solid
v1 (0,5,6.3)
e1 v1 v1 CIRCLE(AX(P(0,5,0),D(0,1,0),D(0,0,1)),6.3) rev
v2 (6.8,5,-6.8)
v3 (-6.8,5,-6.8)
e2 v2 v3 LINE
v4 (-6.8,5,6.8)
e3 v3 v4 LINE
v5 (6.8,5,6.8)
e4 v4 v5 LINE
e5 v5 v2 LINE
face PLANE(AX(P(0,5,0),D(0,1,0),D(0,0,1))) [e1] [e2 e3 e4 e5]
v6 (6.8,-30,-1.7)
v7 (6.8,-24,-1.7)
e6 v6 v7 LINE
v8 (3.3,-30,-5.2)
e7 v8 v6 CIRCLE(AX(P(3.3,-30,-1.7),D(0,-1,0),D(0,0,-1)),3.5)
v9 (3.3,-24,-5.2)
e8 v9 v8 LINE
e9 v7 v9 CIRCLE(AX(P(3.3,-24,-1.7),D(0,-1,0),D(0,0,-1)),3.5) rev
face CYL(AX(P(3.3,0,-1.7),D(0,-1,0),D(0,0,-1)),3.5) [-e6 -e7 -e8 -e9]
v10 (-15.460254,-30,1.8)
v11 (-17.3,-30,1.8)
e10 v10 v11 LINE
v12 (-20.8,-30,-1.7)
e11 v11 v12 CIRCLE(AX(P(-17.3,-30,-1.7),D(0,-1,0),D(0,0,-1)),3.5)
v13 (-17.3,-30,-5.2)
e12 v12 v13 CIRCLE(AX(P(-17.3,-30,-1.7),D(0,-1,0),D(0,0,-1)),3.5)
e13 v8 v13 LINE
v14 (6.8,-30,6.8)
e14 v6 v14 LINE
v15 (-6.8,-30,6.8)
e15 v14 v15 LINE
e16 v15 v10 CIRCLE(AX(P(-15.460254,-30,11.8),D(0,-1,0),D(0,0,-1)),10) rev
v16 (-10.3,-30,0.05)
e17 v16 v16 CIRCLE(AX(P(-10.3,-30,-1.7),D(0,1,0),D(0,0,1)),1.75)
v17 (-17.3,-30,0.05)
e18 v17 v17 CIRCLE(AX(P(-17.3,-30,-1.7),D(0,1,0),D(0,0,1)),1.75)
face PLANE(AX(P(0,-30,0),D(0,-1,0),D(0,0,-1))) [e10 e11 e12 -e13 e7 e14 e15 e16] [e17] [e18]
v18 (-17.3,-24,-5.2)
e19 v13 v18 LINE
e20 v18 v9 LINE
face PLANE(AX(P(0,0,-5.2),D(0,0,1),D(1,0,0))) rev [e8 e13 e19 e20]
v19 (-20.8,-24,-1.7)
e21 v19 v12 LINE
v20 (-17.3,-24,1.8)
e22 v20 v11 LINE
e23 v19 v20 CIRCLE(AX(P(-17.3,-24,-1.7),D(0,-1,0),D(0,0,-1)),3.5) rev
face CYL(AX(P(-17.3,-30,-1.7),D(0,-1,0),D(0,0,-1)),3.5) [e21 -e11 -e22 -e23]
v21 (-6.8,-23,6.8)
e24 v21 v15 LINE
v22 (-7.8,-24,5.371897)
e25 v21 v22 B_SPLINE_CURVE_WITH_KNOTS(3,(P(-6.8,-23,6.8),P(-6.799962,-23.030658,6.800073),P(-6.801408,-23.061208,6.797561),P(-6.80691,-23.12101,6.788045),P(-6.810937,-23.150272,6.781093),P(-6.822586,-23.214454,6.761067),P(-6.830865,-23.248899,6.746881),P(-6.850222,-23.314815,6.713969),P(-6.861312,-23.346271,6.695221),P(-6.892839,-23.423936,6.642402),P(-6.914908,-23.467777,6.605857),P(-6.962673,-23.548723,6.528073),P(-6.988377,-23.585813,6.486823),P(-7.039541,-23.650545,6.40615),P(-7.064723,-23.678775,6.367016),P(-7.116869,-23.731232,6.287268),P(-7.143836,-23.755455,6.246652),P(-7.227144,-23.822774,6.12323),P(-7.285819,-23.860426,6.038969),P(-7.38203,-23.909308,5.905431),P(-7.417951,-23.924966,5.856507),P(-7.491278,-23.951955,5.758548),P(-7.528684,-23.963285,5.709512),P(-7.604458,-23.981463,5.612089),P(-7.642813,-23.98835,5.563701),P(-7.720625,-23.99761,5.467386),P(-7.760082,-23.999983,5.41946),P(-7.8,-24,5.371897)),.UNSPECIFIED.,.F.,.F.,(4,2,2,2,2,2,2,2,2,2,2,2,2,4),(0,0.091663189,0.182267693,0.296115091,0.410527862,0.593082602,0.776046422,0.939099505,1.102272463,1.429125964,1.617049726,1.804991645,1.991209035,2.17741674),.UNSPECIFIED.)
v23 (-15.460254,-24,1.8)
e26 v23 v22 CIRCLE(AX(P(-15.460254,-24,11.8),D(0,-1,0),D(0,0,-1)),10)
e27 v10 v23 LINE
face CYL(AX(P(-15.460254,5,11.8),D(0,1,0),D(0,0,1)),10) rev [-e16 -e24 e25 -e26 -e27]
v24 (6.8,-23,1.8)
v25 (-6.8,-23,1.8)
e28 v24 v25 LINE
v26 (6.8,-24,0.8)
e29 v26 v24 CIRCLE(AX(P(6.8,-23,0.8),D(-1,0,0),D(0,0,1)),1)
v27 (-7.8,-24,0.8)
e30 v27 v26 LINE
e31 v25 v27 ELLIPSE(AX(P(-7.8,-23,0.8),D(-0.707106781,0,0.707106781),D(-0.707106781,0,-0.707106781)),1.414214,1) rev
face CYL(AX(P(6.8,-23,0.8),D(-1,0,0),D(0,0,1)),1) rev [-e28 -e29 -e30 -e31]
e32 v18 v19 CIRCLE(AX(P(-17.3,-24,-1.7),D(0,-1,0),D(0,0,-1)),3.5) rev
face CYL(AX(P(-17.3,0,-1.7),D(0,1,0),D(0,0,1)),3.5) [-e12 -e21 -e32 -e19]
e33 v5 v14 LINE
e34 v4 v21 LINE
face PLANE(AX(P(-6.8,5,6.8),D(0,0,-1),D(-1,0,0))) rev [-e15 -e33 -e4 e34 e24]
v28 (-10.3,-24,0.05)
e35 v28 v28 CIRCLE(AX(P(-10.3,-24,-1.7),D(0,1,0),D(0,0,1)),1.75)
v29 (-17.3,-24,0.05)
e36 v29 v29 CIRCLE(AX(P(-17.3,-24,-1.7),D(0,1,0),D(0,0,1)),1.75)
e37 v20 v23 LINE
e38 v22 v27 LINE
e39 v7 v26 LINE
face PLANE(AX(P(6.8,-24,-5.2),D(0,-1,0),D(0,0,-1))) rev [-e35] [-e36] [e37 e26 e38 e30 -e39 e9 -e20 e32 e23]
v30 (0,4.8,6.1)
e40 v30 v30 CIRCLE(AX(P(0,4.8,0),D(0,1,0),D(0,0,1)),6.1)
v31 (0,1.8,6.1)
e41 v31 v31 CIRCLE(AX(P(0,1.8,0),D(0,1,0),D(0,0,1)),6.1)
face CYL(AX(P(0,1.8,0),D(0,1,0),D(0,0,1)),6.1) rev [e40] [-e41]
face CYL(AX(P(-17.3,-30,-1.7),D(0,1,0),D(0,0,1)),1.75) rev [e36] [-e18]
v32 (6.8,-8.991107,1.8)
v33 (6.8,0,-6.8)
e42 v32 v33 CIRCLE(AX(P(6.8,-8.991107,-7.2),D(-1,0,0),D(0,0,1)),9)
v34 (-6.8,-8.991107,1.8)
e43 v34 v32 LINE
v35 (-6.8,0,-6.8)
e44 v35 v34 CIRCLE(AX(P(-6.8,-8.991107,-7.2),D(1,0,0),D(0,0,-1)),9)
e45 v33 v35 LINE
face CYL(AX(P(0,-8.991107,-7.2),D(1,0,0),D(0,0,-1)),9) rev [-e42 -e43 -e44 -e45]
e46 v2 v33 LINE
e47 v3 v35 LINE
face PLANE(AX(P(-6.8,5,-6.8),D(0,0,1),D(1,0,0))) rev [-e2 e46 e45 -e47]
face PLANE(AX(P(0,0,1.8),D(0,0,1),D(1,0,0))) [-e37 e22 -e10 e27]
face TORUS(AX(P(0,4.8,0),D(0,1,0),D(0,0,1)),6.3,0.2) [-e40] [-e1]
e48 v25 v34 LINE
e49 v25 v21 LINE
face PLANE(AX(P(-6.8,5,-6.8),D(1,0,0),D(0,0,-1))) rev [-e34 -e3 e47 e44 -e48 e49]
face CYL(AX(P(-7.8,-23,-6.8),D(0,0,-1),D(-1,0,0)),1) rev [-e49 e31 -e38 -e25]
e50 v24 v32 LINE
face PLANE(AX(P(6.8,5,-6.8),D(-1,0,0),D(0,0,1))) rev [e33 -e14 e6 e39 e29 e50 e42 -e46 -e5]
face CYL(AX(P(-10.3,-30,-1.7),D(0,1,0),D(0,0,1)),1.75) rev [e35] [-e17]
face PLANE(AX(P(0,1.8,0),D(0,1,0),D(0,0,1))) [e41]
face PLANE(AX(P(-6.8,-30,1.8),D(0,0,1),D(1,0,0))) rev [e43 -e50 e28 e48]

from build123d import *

# Parameters (mm, degrees)
SKETCH1_W           = 13.6
SKETCH1_H           = 13.6
BOSS_EXTRUDE1_DEPTH = 5
SKETCH2_R           = 6.1
CUT_EXTRUDE1_DEPTH  = 3.2
SKETCH3_W           = 13.6
SKETCH3_H           = 5
BOSS_EXTRUDE2_DEPTH = 30
FILLET1_R           = 0.2
FILLET2_R           = 9
SKETCH10_W          = 27.6
SKETCH10_H          = 6
BOSS_EXTRUDE5_DEPTH = 7
SKETCH11_R          = 1.75
CUT_EXTRUDE4_DEPTH  = 37.330152766
FILLET3_R           = 10
FILLET4_R           = 3.5
FILLET5_R           = 1


# Some blends are built 0.0001 mm under size
with BuildPart() as part:
    # Sketch1 → Boss-Extrude1 (new body)
    with BuildSketch(Plane(origin=(0, 0, 0), x_dir=(1, 0, 0), z_dir=(0, 1, 0))):
        Rectangle(SKETCH1_W, SKETCH1_H)
    extrude(amount=BOSS_EXTRUDE1_DEPTH)

    # Sketch2 → Cut-Extrude1 (cut)
    with BuildSketch(Plane(origin=(0, 5, 0), x_dir=(1, 0, 0), z_dir=(0, 1, 0))):
        with Locations(Location((0, 0, 0), (0, 0, 270))):
            Circle(SKETCH2_R)
    extrude(amount=-CUT_EXTRUDE1_DEPTH, mode=Mode.SUBTRACT)

    # Sketch3 → Boss-Extrude2 (add)
    with BuildSketch(Plane.XZ):
        with Locations((0, 4.3)):
            Rectangle(SKETCH3_W, SKETCH3_H)
    extrude(amount=BOSS_EXTRUDE2_DEPTH)

    # Fillet1
    fillet1_edges = [part.edges().sort_by_distance(p)[0] for p in [
        (0, 5, -6.1),
    ]]
    fillet(fillet1_edges, radius=FILLET1_R)

    # Fillet2
    # the kernel refuses this fillet: 9 mm, written as the material it adds along each edge
    with BuildSketch(Plane(origin=(6.8, 0, 1.8), x_dir=(0, 0, -1), z_dir=(-1, 0, 0))) as fillet2_piece_1:
        with BuildLine():
            CenterArc((9, 8.991106717), FILLET2_R, 180, 87.452681817)
            Line((0, 8.991106717), (-0.18, 8.991106717))
            Line((-0.18, 8.991106717), (-0.18, 0))
            Line((-0.18, 0), (0, -0.18))
            ThreePointArc((0, -0.18), (4.3, -0.18), (8.592, -0.179822134))
            Line((8.592, -0.179822134), (8.6, 0))
        make_face()
    extrude(amount=13.6)

    # Sketch10 → Boss-Extrude5 (add)
    with BuildSketch(Plane(origin=(0, 0, 1.8), x_dir=(-1, 0, 0), z_dir=(0, 0, -1))):
        with Locations((7, -27)):
            Rectangle(SKETCH10_W, SKETCH10_H)
    extrude(amount=BOSS_EXTRUDE5_DEPTH)

    # Sketch11 → Cut-Extrude4 (cut, through all)
    with BuildSketch(Plane(origin=(0, -24, 0), x_dir=(1, 0, 0), z_dir=(0, 1, 0))):
        with Locations(Location((-10.3, 1.7, 0), (0, 0, 270))):
            Circle(SKETCH11_R)
        with Locations(Location((-17.3, 1.7, 0), (0, 0, 270))):
            Circle(SKETCH11_R)
    extrude(amount=-CUT_EXTRUDE4_DEPTH, mode=Mode.SUBTRACT)

    # Fillet3
    # the kernel refuses this fillet: 10 mm, written as the material it adds along each edge
    with BuildSketch(Plane(origin=(-6.8, -24, 1.8), x_dir=(0, 0, 1), z_dir=(0, -1, 0))) as fillet3_piece_1:
        with BuildLine():
            CenterArc((10, 8.660254038), FILLET3_R, 180, 60)
            Line((0, 8.660254038), (0, 0))
            Line((0, 0), (5, 0))
        make_face()
    extrude(amount=6)

    # Fillet4
    fillet4_edges = [part.edges().sort_by_distance(p)[0] for p in [
        (-20.8, -27, 1.8),
        (-20.8, -27, -5.2),
        (6.8, -27, -5.2),
    ]]
    fillet(fillet4_edges, radius=FILLET4_R - 0.0001)  # a hair under: the kernel refuses the full size

    # Fillet5
    fillet5_edges = [part.edges().sort_by_distance(p)[0] for p in [
        (0, -24, 1.8),
        (-6.8, -24, 4.3),
    ]]
    fillet(fillet5_edges, radius=FILLET5_R)


solid = part.part
